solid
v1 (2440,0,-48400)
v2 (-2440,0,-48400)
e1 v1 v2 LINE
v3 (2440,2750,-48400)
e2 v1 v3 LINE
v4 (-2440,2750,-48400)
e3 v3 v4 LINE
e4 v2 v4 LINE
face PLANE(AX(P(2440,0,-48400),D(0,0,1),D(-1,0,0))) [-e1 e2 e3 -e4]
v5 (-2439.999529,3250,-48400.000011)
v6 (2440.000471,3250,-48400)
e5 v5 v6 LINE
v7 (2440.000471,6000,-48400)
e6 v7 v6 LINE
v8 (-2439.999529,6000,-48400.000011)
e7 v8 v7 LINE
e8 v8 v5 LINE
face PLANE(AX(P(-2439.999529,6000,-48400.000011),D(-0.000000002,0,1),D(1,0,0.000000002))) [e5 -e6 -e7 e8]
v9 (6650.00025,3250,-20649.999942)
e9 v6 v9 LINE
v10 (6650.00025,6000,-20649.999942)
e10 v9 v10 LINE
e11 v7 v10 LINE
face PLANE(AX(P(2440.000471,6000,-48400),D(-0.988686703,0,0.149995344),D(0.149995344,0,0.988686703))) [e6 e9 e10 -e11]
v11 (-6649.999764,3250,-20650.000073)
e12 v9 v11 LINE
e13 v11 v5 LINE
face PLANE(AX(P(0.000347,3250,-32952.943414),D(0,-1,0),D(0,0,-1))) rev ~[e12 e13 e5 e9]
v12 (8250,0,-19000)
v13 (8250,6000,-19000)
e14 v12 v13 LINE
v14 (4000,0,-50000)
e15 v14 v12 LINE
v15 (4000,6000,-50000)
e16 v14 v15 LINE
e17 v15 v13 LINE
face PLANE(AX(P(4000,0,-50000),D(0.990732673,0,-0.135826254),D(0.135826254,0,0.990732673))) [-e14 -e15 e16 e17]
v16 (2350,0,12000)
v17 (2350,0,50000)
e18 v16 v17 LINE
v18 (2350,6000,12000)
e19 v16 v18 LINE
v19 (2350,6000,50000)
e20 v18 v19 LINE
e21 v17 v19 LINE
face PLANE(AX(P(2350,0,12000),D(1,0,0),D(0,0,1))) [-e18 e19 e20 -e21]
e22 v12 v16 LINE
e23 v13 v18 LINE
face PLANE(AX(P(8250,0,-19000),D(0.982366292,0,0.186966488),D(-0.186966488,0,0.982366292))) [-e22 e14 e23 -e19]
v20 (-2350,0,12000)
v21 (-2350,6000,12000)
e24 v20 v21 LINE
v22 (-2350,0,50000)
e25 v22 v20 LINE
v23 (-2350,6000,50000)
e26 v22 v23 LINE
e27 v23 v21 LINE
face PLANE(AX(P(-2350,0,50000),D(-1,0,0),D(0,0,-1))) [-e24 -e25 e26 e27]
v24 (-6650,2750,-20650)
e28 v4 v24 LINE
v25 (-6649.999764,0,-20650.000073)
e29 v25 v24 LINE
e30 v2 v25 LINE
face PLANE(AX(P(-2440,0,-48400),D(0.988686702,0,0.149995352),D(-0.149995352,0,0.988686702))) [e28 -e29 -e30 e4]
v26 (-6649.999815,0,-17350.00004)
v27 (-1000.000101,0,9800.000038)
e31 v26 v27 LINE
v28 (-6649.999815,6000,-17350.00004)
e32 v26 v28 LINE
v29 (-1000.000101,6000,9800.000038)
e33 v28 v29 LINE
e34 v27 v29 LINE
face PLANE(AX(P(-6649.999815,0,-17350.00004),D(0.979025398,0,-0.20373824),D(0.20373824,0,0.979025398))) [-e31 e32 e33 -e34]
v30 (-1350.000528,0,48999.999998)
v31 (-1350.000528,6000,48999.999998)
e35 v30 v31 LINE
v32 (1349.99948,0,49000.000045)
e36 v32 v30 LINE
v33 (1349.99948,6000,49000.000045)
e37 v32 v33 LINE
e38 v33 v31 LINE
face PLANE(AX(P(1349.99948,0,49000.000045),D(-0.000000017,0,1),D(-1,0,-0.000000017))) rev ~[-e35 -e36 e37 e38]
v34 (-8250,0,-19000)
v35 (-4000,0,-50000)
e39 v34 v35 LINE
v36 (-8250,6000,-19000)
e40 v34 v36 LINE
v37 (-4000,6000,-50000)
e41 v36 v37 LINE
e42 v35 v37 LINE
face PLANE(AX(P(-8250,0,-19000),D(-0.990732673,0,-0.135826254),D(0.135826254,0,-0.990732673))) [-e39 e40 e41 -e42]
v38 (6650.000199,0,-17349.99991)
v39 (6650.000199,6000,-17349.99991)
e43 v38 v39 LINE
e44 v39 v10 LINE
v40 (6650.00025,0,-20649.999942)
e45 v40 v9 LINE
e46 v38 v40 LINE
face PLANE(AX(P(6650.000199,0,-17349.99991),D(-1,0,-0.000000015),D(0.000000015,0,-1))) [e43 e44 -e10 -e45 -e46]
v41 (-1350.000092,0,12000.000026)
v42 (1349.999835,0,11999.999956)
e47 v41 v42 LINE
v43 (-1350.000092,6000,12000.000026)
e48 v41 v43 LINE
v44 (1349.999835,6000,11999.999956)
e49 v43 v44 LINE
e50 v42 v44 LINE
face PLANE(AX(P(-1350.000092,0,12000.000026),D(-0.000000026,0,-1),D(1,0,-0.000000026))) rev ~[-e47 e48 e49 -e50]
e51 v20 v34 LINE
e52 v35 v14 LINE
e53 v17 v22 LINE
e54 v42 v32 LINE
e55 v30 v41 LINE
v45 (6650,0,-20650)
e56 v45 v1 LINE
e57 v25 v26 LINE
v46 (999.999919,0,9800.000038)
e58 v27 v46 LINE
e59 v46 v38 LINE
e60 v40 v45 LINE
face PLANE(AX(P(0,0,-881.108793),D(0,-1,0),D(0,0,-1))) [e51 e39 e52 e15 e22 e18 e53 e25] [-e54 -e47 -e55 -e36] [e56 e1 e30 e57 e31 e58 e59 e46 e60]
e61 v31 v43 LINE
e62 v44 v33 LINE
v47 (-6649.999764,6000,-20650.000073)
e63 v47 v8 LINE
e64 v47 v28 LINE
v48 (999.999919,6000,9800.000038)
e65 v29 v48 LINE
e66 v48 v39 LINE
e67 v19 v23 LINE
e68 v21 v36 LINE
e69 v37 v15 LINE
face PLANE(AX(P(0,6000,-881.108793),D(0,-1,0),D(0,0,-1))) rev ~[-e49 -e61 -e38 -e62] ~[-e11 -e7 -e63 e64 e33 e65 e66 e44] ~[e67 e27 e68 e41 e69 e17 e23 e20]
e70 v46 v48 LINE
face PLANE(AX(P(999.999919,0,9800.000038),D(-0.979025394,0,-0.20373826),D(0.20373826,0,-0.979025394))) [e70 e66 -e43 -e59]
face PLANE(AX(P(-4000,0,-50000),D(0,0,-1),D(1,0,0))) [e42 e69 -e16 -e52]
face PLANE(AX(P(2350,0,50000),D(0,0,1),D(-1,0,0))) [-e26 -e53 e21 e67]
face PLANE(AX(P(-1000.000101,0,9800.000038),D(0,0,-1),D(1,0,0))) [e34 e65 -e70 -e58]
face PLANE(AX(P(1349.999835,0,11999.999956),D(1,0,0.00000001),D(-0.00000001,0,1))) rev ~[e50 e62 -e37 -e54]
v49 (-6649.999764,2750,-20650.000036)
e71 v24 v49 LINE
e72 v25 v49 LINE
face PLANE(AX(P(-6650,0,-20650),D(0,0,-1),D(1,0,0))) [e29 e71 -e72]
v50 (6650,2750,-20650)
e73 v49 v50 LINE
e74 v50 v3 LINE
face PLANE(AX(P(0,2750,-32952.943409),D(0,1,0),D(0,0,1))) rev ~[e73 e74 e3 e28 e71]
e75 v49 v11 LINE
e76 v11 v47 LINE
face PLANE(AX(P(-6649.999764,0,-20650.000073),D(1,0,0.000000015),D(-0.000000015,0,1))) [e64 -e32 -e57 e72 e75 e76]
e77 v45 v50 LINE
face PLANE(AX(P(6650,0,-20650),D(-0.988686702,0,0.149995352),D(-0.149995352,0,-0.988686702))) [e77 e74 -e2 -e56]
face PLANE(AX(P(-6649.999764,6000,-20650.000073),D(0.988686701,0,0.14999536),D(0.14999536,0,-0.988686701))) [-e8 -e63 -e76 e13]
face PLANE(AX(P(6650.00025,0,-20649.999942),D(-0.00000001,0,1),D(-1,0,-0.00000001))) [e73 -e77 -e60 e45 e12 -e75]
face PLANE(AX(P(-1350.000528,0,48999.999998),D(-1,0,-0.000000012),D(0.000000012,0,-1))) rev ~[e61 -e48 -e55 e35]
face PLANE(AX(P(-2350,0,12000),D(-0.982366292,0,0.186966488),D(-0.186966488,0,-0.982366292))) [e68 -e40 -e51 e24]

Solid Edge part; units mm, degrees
sketch "Sketch1" plane through (0, 0, 0) normal (0, -1, 0) x (1, 0, 0)
  line L0 (2350, 12000) -> (2350, 50000)
  line L1 (2350, 50000) -> (-2350, 50000)
  line L2 (-2350, 50000) -> (-2350, 12000)
  line L3 (-2350, 12000) -> (-8250, -19000)
  line L4 (-8250, -19000) -> (-4000, -50000)
  line L5 (-4000, -50000) -> (4000, -50000)
  line L6 (4000, -50000) -> (8250, -19000)
  line L7 (8250, -19000) -> (2350, 12000)
extrude "Protrusion1" add sketch "Sketch1" against normal blind 6000
sketch "Sketch2" plane through (0, 0, 0) normal (0, -1, 0) x (-0.1869665, 0, 0.9823663)
  line L0 (11535.9907, -3569.7923) -> (47883.5436, -10487.5524)
  line L1 (47883.5436, -10487.5524) -> (48388.3531, -7835.1634)
  line L2 (48388.3531, -7835.1634) -> (12040.8003, -917.4034)
  line L3 (12040.8003, -917.4034) -> (11535.9907, -3569.7923)
  line L4 (9440.2232, -2814.6379) -> (-18287.3823, -3288.8673)
  line L5 (-18287.3823, -3288.8673) -> (-21529.1911, -2671.8779)
  line L6 (-21529.1911, -2671.8779) -> (-19042.5368, 10393.5938)
  line L7 (-19042.5368, 10393.5938) -> (-15800.728, 9776.6044)
  line L8 (-15800.728, 9776.6044) -> (9814.1562, -849.9053)
  line L9 (9814.1562, -849.9053) -> (9440.2232, -2814.6379)
extrude "Cutout1" cut sketch "Sketch2" against normal blind 61943.5463
sketch "Sketch3" plane through (0, 0, 0) normal (0, -1, 0) x (1, 0, 0)
  line L0 (-2440, -48400) -> (-6650, -20650)
  line L1 (-6650, -20650) -> (6650, -20650)
  line L2 (6650, -20650) -> (2440, -48400)
  line L3 (2440, -48400) -> (-2440, -48400)
extrude "Cutout2" cut sketch "Sketch3" against normal blind 2750
sketch "Sketch4" plane through (0, 6000, 0) normal (0, 1, 0) x (0.1869665, 0, -0.9823663)
  line L0 (21529.1911, -2671.8779) -> (19042.5368, 10393.5938)
  line L1 (19042.5368, 10393.5938) -> (47090.3303, 11446.1518)
  line L2 (47090.3303, 11446.1518) -> (48002.7268, 6652.2043)
  line L3 (48002.7268, 6652.2043) -> (21529.1911, -2671.8779)
extrude "Cutout3" cut sketch "Sketch4" against normal blind 2750
